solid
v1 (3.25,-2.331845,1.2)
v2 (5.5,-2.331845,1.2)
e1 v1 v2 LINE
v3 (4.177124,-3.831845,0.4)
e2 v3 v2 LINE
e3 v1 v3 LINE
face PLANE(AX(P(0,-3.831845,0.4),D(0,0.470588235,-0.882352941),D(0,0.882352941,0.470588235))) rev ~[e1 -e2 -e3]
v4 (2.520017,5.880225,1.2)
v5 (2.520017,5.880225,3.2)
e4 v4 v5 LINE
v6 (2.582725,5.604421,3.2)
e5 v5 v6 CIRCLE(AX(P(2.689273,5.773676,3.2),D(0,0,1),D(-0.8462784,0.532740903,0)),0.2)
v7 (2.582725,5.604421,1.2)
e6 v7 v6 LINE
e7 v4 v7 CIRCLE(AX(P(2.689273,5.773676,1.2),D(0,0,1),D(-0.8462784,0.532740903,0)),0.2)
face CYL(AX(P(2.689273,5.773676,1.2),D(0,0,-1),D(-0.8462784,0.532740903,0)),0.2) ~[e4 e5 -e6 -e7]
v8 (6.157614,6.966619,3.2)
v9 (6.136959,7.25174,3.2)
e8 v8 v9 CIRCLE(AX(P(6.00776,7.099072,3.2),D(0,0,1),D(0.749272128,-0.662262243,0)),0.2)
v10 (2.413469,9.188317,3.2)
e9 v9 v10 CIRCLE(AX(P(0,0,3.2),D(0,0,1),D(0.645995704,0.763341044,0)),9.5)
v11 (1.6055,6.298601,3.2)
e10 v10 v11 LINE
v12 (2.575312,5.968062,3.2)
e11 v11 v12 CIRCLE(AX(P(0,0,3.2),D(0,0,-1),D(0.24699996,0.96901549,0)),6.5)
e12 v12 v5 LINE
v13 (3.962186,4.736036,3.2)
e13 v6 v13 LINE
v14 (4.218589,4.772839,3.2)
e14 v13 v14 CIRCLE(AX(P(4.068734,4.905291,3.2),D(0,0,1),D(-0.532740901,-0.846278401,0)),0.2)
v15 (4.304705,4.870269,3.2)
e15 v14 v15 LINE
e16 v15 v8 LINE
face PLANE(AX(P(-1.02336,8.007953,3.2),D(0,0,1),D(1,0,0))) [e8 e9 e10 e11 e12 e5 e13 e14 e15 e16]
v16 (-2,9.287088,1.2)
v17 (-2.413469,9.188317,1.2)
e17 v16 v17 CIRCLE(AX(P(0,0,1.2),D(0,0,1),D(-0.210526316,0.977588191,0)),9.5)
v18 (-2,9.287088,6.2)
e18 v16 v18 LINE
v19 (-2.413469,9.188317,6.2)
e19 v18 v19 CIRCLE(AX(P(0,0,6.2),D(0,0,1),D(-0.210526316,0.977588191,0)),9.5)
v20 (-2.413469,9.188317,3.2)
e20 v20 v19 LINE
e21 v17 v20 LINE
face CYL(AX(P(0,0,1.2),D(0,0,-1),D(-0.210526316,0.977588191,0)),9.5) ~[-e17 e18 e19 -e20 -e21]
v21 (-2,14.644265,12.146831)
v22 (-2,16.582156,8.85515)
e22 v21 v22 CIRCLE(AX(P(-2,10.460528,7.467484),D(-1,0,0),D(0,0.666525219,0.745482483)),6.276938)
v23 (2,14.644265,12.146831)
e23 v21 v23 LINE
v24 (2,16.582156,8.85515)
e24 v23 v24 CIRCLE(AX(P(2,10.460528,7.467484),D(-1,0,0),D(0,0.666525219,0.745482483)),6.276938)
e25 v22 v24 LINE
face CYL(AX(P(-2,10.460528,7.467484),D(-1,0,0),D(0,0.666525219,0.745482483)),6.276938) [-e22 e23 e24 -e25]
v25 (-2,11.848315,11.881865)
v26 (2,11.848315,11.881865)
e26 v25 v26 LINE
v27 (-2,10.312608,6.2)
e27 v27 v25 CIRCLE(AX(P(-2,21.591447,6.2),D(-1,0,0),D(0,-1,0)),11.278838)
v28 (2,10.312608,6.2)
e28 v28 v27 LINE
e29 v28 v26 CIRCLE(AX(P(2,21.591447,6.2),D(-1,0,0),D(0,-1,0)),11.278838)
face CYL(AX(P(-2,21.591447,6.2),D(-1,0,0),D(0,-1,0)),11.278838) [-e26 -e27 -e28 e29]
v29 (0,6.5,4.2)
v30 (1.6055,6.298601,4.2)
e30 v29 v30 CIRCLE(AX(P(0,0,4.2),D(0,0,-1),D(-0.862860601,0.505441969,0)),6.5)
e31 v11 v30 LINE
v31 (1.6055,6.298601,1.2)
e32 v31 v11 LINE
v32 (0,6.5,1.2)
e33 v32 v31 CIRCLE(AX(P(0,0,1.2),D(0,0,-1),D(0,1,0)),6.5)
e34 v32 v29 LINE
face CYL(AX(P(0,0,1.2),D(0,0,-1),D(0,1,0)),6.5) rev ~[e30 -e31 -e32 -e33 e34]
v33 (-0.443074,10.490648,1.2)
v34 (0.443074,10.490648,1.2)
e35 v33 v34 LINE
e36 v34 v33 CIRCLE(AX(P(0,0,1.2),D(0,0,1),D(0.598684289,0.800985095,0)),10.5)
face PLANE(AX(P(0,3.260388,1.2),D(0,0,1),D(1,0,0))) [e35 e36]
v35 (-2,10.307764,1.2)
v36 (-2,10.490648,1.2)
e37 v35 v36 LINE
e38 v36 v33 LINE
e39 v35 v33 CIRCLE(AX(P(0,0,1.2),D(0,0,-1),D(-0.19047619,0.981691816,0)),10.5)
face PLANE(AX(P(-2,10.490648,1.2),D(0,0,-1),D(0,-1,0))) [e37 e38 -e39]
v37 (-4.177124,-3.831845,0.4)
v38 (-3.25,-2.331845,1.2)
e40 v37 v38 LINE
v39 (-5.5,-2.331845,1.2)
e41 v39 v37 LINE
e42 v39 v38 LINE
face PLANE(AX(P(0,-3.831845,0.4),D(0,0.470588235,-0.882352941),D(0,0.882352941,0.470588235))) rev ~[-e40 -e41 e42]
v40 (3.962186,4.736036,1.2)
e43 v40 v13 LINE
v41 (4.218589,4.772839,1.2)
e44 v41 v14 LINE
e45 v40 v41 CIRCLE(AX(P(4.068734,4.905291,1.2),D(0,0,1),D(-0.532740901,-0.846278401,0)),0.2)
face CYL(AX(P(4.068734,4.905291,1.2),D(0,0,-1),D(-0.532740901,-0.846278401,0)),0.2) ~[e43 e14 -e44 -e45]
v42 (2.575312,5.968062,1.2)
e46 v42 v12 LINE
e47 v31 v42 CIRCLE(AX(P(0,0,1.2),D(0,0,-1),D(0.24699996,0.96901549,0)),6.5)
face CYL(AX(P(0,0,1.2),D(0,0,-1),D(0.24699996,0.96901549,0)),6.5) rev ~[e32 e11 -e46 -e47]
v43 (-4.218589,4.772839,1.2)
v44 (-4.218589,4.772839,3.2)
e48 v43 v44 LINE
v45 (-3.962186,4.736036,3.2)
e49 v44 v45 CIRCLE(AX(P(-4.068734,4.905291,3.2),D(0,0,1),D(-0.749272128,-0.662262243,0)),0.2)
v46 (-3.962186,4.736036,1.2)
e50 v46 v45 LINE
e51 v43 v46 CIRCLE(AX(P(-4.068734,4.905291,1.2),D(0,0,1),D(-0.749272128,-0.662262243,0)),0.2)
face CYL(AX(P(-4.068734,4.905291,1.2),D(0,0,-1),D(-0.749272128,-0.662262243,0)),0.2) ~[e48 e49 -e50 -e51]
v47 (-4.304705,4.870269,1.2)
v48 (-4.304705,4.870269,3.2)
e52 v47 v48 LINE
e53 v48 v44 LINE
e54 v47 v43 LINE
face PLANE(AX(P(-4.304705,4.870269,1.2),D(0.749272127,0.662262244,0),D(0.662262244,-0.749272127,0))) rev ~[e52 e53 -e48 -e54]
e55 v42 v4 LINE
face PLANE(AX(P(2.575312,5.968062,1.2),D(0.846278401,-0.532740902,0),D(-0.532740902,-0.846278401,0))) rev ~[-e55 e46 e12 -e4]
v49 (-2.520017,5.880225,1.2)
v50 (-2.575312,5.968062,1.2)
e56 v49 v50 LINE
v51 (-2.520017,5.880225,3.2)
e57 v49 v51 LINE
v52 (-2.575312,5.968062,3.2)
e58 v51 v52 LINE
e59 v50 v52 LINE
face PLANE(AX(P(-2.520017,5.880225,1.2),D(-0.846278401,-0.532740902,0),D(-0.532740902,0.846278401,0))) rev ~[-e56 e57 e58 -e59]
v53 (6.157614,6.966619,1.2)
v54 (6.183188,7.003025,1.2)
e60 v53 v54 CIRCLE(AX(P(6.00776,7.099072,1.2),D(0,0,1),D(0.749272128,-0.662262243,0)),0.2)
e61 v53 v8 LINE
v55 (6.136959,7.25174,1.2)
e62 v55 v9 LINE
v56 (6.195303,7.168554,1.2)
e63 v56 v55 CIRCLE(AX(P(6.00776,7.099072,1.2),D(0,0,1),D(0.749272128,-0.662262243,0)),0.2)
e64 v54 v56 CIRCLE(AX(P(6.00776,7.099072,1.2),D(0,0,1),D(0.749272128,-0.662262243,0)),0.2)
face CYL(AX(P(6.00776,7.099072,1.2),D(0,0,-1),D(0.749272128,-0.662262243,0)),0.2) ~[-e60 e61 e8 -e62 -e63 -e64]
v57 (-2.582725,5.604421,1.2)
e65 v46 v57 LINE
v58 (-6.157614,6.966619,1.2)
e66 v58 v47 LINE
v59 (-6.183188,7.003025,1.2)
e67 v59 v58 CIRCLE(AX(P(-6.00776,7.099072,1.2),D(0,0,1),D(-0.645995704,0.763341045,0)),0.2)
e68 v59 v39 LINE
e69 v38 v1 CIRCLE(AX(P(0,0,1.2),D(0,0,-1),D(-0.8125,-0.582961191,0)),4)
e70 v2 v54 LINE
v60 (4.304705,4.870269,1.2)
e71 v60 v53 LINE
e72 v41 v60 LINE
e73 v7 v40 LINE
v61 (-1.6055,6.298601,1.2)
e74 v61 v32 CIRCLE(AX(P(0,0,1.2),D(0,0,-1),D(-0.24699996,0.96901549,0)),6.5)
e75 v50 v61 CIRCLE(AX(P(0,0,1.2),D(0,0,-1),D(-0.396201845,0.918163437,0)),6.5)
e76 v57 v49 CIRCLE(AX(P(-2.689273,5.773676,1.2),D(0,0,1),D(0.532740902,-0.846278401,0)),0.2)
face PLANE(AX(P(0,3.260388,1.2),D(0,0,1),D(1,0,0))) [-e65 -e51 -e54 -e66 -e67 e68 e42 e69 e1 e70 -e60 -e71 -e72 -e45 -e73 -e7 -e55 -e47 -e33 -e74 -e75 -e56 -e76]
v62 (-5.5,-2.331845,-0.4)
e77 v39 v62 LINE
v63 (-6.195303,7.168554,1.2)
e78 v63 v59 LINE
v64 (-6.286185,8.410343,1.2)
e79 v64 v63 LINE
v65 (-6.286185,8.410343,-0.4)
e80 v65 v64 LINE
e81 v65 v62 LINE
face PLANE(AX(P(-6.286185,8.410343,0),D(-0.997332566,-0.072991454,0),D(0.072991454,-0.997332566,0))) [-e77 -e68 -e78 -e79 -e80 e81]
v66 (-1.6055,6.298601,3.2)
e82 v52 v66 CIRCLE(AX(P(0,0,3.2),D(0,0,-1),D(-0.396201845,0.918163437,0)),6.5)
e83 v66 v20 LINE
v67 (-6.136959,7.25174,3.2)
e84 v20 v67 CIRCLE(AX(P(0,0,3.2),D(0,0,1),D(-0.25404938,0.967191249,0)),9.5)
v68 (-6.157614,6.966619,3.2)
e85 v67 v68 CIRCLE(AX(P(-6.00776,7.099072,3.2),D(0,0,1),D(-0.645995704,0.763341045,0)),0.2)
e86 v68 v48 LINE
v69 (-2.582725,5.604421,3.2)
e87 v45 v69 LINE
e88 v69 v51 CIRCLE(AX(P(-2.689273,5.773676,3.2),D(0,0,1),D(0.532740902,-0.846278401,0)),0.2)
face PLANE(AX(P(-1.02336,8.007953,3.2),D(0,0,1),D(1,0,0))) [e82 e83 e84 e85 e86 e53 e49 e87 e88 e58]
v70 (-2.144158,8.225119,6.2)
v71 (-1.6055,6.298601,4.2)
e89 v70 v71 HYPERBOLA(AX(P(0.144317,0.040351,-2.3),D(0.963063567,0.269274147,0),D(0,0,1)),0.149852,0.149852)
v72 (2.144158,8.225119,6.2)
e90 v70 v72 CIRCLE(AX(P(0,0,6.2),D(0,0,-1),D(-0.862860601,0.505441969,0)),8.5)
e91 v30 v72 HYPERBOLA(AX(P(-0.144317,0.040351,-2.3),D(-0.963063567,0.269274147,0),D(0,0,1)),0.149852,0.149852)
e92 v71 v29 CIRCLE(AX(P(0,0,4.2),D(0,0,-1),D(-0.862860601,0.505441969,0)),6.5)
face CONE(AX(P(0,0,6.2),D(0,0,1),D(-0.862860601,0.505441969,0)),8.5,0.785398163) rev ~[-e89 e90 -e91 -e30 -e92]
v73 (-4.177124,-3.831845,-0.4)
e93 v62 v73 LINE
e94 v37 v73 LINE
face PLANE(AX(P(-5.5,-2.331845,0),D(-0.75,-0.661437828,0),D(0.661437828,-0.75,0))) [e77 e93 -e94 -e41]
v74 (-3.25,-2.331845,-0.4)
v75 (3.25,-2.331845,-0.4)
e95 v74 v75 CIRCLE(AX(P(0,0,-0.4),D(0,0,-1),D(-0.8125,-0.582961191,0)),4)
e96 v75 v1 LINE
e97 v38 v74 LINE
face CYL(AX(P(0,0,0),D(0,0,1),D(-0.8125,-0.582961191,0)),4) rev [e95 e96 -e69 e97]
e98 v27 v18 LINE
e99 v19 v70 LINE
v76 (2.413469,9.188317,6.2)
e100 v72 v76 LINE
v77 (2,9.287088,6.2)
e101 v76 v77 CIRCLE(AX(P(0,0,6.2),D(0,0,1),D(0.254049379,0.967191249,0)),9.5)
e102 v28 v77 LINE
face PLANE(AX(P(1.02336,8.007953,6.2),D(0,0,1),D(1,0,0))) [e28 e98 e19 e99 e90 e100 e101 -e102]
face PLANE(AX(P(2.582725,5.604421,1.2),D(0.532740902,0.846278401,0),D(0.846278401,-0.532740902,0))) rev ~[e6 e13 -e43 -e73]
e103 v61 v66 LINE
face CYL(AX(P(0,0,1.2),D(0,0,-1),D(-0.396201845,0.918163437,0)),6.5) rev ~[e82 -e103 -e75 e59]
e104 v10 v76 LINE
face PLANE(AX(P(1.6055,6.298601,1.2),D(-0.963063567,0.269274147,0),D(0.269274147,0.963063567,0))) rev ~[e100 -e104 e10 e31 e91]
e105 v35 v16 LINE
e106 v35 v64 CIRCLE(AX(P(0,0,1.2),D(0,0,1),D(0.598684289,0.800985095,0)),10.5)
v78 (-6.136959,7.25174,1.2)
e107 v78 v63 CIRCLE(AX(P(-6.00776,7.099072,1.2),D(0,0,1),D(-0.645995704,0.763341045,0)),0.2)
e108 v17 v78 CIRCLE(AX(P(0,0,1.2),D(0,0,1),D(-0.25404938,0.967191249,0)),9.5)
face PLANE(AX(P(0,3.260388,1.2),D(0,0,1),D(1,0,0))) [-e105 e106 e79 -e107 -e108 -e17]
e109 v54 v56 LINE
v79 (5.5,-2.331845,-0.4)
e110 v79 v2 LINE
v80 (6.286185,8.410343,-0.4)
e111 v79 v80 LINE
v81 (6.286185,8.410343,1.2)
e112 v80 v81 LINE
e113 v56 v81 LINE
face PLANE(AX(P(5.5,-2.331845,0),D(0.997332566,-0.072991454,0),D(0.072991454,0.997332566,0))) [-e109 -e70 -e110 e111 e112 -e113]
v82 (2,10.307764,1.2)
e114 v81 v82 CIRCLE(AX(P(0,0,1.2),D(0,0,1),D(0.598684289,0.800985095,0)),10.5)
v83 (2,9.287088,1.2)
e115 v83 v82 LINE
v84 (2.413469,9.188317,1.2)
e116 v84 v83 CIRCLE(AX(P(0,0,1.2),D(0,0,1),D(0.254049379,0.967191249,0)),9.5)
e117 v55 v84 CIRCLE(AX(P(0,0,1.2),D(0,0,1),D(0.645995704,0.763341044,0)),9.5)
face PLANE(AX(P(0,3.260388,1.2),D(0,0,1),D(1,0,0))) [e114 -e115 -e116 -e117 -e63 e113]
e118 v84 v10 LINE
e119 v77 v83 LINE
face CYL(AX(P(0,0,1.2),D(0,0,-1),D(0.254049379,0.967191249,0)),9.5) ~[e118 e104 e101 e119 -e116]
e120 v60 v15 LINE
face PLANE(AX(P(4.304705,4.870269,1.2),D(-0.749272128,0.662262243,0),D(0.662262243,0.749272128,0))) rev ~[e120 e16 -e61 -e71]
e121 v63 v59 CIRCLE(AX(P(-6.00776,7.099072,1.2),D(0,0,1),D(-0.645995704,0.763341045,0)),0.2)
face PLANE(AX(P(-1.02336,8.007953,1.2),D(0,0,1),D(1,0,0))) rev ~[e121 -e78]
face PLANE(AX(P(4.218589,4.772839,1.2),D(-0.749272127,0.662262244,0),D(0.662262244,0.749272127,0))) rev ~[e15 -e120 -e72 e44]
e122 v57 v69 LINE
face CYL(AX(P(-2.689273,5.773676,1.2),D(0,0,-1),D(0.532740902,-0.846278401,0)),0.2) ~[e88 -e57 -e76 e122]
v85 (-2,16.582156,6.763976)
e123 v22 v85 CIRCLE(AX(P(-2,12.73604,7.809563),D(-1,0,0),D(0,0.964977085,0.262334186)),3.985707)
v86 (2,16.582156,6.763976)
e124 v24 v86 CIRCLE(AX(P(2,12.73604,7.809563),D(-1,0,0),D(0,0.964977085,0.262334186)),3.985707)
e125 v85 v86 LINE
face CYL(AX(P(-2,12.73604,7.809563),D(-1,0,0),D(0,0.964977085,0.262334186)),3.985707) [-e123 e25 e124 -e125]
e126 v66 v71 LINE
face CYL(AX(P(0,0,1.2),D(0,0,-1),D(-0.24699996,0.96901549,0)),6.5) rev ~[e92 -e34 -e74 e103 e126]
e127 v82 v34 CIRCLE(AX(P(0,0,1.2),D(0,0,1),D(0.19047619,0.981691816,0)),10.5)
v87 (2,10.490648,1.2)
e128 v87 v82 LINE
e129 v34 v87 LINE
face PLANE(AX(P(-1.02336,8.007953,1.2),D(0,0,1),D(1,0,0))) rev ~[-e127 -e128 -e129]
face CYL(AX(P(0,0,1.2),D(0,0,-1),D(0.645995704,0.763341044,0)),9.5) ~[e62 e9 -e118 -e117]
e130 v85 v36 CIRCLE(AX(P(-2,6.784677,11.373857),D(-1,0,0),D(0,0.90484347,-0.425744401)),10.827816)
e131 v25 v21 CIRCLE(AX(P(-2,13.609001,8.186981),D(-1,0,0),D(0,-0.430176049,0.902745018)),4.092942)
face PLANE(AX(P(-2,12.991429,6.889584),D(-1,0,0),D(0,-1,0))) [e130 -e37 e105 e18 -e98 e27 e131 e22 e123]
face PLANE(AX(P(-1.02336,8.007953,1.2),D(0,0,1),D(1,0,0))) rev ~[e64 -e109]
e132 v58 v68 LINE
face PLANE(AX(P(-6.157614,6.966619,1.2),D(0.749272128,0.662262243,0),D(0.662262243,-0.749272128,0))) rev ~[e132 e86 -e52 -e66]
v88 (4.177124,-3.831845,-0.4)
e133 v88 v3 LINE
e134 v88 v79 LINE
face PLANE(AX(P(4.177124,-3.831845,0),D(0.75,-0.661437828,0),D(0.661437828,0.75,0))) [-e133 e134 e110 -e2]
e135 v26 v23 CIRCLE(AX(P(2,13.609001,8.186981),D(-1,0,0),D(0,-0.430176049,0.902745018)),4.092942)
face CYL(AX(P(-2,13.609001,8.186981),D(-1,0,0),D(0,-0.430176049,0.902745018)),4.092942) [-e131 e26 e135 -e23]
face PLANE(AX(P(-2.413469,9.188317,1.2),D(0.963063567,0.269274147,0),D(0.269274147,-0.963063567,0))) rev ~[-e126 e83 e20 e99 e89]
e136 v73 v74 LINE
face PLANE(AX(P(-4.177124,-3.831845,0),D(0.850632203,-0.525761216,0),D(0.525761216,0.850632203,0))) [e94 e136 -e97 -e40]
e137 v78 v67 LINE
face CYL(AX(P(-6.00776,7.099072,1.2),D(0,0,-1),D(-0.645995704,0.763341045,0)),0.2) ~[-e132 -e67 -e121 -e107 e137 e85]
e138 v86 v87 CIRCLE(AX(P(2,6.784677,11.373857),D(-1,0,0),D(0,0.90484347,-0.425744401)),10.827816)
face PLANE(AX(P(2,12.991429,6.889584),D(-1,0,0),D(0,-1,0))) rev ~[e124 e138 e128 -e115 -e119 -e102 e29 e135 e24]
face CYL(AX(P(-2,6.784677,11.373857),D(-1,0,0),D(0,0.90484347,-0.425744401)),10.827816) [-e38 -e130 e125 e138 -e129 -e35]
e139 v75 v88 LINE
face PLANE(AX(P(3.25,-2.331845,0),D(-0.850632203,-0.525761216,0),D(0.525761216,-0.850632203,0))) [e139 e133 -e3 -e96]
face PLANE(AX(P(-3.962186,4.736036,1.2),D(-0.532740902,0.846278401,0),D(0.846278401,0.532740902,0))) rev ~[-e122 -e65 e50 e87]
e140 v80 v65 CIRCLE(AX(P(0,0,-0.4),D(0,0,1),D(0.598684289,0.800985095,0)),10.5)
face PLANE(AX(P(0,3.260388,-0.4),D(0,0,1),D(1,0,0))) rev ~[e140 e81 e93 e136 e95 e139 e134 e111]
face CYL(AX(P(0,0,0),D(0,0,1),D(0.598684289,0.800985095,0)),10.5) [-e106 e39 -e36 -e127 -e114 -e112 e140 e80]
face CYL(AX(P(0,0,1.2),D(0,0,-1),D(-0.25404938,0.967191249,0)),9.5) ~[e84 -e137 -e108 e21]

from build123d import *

# Parameters (mm, degrees)
F1_DEPTH      = 1.2
F1_DEPTH_BACK = 0.4
F3_DEPTH      = 12.5
F5_DEPTH      = 2
F6_DEPTH      = 5
F7_T2_ANGLE   = 119.2786087223
F8_DEPTH      = 5
F10_DEPTH     = 4
F11_DEPTH     = 5


# Not quite as in the source:
# - a fillet or chamfer that OpenCascade refuses, or shapes differently, is made with other operations: its cross-section is extruded or revolved along the edge and cut away or added
# - a feature names something its author has since deleted; it is built from what else it names


with BuildPart() as f1:
    # F0 (on Top) → F1 (new body, two sides)
    with BuildSketch(Plane.XY) as f1_sk:
        with BuildLine():
            ThreePointArc((-3.25, -2.3318447633), (0, 4), (3.25, -2.3318447633))
            Line((3.25, -2.3318447633), (4.1771243445, -3.8318447633))
            Line((4.1771243445, -3.8318447633), (5.5, -2.3318447633))
            Line((5.5, -2.3318447633), (6.2861850371, 8.4103434936))
            ThreePointArc((6.2861850371, 8.4103434936), (0, 10.5), (-6.2861850371, 8.4103434936))
            Line((-6.2861850371, 8.4103434936), (-5.5, -2.3318447633))
            Line((-5.5, -2.3318447633), (-4.1771243445, -3.8318447633))
            Line((-4.1771243445, -3.8318447633), (-3.25, -2.3318447633))
        make_face()
    extrude(amount=F1_DEPTH)
    extrude(f1_sk.sketch, amount=-F1_DEPTH_BACK)

    # F2 (on Right) → F3 (cut, symmetric)
    with BuildSketch(Plane.YZ):
        Polygon((-3.8318447633, 0.4), (-2.3318447633, 1.2), (-3.8318447633, 1.2), align=None)
    extrude(amount=F3_DEPTH, both=True, mode=Mode.SUBTRACT)

    # F4 (on face) → F5 (join)
    with BuildSketch(Plane.XY.offset(1.2)):
        with BuildLine():
            Line((0, 9.4893432962), (0, 9.5))
            ThreePointArc((0, 9.5), (-1.0056504861, 9.4466219941), (-2, 9.2870878105))
            ThreePointArc((-2, 9.2870878105), (-2.207287093, 9.2400153511), (-2.4134691055, 9.1883168686))
            Line((-2.4134691055, 9.1883168686), (-1.6054997382, 6.2986006851))
            ThreePointArc((-1.6054997382, 6.2986006851), (-0.809041268, 6.4494536378), (0, 6.5))
            Line((0, 6.5), (0, 9.4893432962))
        make_face()
        with BuildLine():
            Line((0, 10.3126084432), (0, 9.5))
            ThreePointArc((0, 9.5), (1.0056504861, 9.4466219941), (2, 9.2870878105))
            Line((2, 9.2870878105), (2, 10.3126084432))
            Line((2, 10.3126084432), (0, 10.3126084432))
        make_face()
        with BuildLine():
            ThreePointArc((2, 9.2870878105), (1.0056504861, 9.4466219941), (0, 9.5))
            Line((0, 9.5), (0, 9.4893432962))
            Line((0, 9.4893432962), (0, 6.5))
            ThreePointArc((0, 6.5), (0.809041268, 6.4494536378), (1.6054997382, 6.2986006851))
            Line((1.6054997382, 6.2986006851), (2.4134691055, 9.1883168686))
            ThreePointArc((2.4134691055, 9.1883168686), (2.207287093, 9.2400153511), (2, 9.2870878105))
        make_face()
        with BuildLine():
            ThreePointArc((-2, 9.2870878105), (-1.0056504861, 9.4466219941), (0, 9.5))
            Line((0, 9.5), (0, 10.3126084432))
            Line((0, 10.3126084432), (-2, 10.3126084432))
            Line((-2, 10.3126084432), (-2, 9.2870878105))
        make_face()
        with BuildLine():
            Line((-1.6054997382, 6.2986006851), (-2.4134691055, 9.1883168686))
            ThreePointArc((-2.4134691055, 9.1883168686), (-4.3834961594, 8.4282240965), (-6.1369591907, 7.2517399217))
            ThreePointArc((-6.1369591907, 7.2517399217), (-6.2072372931, 7.1135226449), (-6.1576144754, 6.9666192642))
            Line((-6.1576144754, 6.9666192642), (-4.3047045796, 4.8702688306))
            Line((-4.3047045796, 4.8702688306), (-4.2185888433, 4.7728389657))
            ThreePointArc((-4.2185888433, 4.7728389657), (-4.0971505607, 4.7073203992), (-3.9621862374, 4.7360357341))
            Line((-3.9621862374, 4.7360357341), (-2.5827247856, 5.6044208159))
            ThreePointArc((-2.5827247856, 5.6044208159), (-2.4942501859, 5.7293355978), (-2.5200172859, 5.8802246764))
            Line((-2.5200172859, 5.8802246764), (-2.5753119947, 5.968062343))
            ThreePointArc((-2.5753119947, 5.968062343), (-2.096928846, 6.152470188), (-1.6054997382, 6.2986006851))
        make_face()
        with BuildLine():
            ThreePointArc((6.1369591907, 7.2517399217), (4.3834961594, 8.4282240965), (2.4134691055, 9.1883168686))
            Line((2.4134691055, 9.1883168686), (1.6054997382, 6.2986006851))
            ThreePointArc((1.6054997382, 6.2986006851), (2.096928846, 6.152470188), (2.5753119947, 5.968062343))
            Line((2.5753119947, 5.968062343), (2.5200172859, 5.8802246764))
            ThreePointArc((2.5200172859, 5.8802246764), (2.4942501859, 5.7293355978), (2.5827247856, 5.6044208159))
            Line((2.5827247856, 5.6044208159), (3.9621862374, 4.7360357341))
            ThreePointArc((3.9621862374, 4.7360357341), (4.0971505607, 4.7073203992), (4.2185888433, 4.7728389657))
            Line((4.2185888433, 4.7728389657), (4.3047045796, 4.8702688306))
            Line((4.3047045796, 4.8702688306), (6.1576144754, 6.9666192642))
            ThreePointArc((6.1576144754, 6.9666192642), (6.2072372931, 7.1135226449), (6.1369591907, 7.2517399217))
        make_face()
    extrude(amount=F5_DEPTH)

    # F4 (on face) → F6 (join)
    with BuildSketch(Plane.XY.offset(1.2)):
        with BuildLine():
            ThreePointArc((2, 9.2870878105), (1.0056504861, 9.4466219941), (0, 9.5))
            Line((0, 9.5), (0, 9.4893432962))
            Line((0, 9.4893432962), (0, 6.5))
            ThreePointArc((0, 6.5), (0.809041268, 6.4494536378), (1.6054997382, 6.2986006851))
            Line((1.6054997382, 6.2986006851), (2.4134691055, 9.1883168686))
            ThreePointArc((2.4134691055, 9.1883168686), (2.207287093, 9.2400153511), (2, 9.2870878105))
        make_face()
        with BuildLine():
            Line((0, 9.4893432962), (0, 9.5))
            ThreePointArc((0, 9.5), (-1.0056504861, 9.4466219941), (-2, 9.2870878105))
            ThreePointArc((-2, 9.2870878105), (-2.207287093, 9.2400153511), (-2.4134691055, 9.1883168686))
            Line((-2.4134691055, 9.1883168686), (-1.6054997382, 6.2986006851))
            ThreePointArc((-1.6054997382, 6.2986006851), (-0.809041268, 6.4494536378), (0, 6.5))
            Line((0, 6.5), (0, 9.4893432962))
        make_face()
    extrude(amount=F6_DEPTH)

    # F7: chamfer of 2 on 1 edges, made by hand

    # F7_s1 → F7_t2 (revolve, cut)
    with BuildSketch(Plane(origin=(0, 0, 0), x_dir=(0, 0, 1), z_dir=(-0.5054419689, -0.8628606006, 0))):
        Polygon((6.2, 8.5), (4.2, 6.5), (6.2, 6.5), align=None)
    revolve(axis=Axis((0, 0, 6.2), (0, 0, -1)), revolution_arc=F7_T2_ANGLE, mode=Mode.SUBTRACT)

    # F4 (on face) → F8 (join, through all)
    with BuildSketch(Plane.XY.offset(1.2)):
        with BuildLine():
            Line((0, 10.3126084432), (0, 9.5))
            ThreePointArc((0, 9.5), (1.0056504861, 9.4466219941), (2, 9.2870878105))
            Line((2, 9.2870878105), (2, 10.307764064))
            ThreePointArc((2, 10.307764064), (1.9874359165, 10.3101939108), (1.974868881, 10.3126084432))
            Line((1.974868881, 10.3126084432), (0, 10.3126084432))
        make_face()
        with BuildLine():
            ThreePointArc((1.974868881, 10.3126084432), (1.9874359165, 10.3101939108), (2, 10.307764064))
            Line((2, 10.307764064), (2, 10.3126084432))
            Line((2, 10.3126084432), (1.974868881, 10.3126084432))
        make_face()
        with BuildLine():
            Line((-2, 10.3126084432), (-2, 10.307764064))
            ThreePointArc((-2, 10.307764064), (-1.9874359165, 10.3101939108), (-1.974868881, 10.3126084432))
            Line((-1.974868881, 10.3126084432), (-2, 10.3126084432))
        make_face()
        with BuildLine():
            ThreePointArc((-2, 9.2870878105), (-1.0056504861, 9.4466219941), (0, 9.5))
            Line((0, 9.5), (0, 10.3126084432))
            Line((0, 10.3126084432), (-1.974868881, 10.3126084432))
            ThreePointArc((-1.974868881, 10.3126084432), (-1.9874359165, 10.3101939108), (-2, 10.307764064))
            Line((-2, 10.307764064), (-2, 9.2870878105))
        make_face()
    extrude(amount=F8_DEPTH)

    # F9 (on face) → F10 (join)
    with BuildSketch(Plane(origin=(-2, 0, 0), x_dir=(0, -1, 0), z_dir=(-1, 0, 0))):
        with BuildLine():
            Line((-10.4906475171, 1.2), (-10.3126084432, 1.2))
            Line((-10.3126084432, 1.2), (-10.3126084432, 6.2))
            ThreePointArc((-10.3126084432, 6.2), (-10.7033019047, 9.142871965), (-11.848315427, 11.8818646297))
            ThreePointArc((-11.848315427, 11.8818646297), (-13.2228522743, 12.2616673302), (-14.6442650052, 12.1468305588))
            ThreePointArc((-14.6442650052, 12.1468305588), (-15.8696799602, 10.6519801079), (-16.5821556002, 8.8551500812))
            ThreePointArc((-16.5821556002, 8.8551500812), (-16.7217466821, 7.8095628414), (-16.5821556002, 6.7639756016))
            ThreePointArc((-16.5821556002, 6.7639756016), (-14.0870903715, 3.3790869985), (-10.4906475171, 1.2))
        make_face()
    extrude(amount=-F10_DEPTH)

    # F4 (on face) → F11 (join, through all)
    with BuildSketch(Plane.XY.offset(1.2)):
        with BuildLine():
            Line((0, 10.3126084432), (0, 9.5))
            ThreePointArc((0, 9.5), (1.0056504861, 9.4466219941), (2, 9.2870878105))
            Line((2, 9.2870878105), (2, 10.307764064))
            ThreePointArc((2, 10.307764064), (1.9874359165, 10.3101939108), (1.974868881, 10.3126084432))
            Line((1.974868881, 10.3126084432), (0, 10.3126084432))
        make_face()
        with BuildLine():
            ThreePointArc((-2, 9.2870878105), (-1.0056504861, 9.4466219941), (0, 9.5))
            Line((0, 9.5), (0, 10.3126084432))
            Line((0, 10.3126084432), (-1.974868881, 10.3126084432))
            ThreePointArc((-1.974868881, 10.3126084432), (-1.9874359165, 10.3101939108), (-2, 10.307764064))
            Line((-2, 10.307764064), (-2, 9.2870878105))
        make_face()
    extrude(amount=F11_DEPTH)


solid = f1.part
